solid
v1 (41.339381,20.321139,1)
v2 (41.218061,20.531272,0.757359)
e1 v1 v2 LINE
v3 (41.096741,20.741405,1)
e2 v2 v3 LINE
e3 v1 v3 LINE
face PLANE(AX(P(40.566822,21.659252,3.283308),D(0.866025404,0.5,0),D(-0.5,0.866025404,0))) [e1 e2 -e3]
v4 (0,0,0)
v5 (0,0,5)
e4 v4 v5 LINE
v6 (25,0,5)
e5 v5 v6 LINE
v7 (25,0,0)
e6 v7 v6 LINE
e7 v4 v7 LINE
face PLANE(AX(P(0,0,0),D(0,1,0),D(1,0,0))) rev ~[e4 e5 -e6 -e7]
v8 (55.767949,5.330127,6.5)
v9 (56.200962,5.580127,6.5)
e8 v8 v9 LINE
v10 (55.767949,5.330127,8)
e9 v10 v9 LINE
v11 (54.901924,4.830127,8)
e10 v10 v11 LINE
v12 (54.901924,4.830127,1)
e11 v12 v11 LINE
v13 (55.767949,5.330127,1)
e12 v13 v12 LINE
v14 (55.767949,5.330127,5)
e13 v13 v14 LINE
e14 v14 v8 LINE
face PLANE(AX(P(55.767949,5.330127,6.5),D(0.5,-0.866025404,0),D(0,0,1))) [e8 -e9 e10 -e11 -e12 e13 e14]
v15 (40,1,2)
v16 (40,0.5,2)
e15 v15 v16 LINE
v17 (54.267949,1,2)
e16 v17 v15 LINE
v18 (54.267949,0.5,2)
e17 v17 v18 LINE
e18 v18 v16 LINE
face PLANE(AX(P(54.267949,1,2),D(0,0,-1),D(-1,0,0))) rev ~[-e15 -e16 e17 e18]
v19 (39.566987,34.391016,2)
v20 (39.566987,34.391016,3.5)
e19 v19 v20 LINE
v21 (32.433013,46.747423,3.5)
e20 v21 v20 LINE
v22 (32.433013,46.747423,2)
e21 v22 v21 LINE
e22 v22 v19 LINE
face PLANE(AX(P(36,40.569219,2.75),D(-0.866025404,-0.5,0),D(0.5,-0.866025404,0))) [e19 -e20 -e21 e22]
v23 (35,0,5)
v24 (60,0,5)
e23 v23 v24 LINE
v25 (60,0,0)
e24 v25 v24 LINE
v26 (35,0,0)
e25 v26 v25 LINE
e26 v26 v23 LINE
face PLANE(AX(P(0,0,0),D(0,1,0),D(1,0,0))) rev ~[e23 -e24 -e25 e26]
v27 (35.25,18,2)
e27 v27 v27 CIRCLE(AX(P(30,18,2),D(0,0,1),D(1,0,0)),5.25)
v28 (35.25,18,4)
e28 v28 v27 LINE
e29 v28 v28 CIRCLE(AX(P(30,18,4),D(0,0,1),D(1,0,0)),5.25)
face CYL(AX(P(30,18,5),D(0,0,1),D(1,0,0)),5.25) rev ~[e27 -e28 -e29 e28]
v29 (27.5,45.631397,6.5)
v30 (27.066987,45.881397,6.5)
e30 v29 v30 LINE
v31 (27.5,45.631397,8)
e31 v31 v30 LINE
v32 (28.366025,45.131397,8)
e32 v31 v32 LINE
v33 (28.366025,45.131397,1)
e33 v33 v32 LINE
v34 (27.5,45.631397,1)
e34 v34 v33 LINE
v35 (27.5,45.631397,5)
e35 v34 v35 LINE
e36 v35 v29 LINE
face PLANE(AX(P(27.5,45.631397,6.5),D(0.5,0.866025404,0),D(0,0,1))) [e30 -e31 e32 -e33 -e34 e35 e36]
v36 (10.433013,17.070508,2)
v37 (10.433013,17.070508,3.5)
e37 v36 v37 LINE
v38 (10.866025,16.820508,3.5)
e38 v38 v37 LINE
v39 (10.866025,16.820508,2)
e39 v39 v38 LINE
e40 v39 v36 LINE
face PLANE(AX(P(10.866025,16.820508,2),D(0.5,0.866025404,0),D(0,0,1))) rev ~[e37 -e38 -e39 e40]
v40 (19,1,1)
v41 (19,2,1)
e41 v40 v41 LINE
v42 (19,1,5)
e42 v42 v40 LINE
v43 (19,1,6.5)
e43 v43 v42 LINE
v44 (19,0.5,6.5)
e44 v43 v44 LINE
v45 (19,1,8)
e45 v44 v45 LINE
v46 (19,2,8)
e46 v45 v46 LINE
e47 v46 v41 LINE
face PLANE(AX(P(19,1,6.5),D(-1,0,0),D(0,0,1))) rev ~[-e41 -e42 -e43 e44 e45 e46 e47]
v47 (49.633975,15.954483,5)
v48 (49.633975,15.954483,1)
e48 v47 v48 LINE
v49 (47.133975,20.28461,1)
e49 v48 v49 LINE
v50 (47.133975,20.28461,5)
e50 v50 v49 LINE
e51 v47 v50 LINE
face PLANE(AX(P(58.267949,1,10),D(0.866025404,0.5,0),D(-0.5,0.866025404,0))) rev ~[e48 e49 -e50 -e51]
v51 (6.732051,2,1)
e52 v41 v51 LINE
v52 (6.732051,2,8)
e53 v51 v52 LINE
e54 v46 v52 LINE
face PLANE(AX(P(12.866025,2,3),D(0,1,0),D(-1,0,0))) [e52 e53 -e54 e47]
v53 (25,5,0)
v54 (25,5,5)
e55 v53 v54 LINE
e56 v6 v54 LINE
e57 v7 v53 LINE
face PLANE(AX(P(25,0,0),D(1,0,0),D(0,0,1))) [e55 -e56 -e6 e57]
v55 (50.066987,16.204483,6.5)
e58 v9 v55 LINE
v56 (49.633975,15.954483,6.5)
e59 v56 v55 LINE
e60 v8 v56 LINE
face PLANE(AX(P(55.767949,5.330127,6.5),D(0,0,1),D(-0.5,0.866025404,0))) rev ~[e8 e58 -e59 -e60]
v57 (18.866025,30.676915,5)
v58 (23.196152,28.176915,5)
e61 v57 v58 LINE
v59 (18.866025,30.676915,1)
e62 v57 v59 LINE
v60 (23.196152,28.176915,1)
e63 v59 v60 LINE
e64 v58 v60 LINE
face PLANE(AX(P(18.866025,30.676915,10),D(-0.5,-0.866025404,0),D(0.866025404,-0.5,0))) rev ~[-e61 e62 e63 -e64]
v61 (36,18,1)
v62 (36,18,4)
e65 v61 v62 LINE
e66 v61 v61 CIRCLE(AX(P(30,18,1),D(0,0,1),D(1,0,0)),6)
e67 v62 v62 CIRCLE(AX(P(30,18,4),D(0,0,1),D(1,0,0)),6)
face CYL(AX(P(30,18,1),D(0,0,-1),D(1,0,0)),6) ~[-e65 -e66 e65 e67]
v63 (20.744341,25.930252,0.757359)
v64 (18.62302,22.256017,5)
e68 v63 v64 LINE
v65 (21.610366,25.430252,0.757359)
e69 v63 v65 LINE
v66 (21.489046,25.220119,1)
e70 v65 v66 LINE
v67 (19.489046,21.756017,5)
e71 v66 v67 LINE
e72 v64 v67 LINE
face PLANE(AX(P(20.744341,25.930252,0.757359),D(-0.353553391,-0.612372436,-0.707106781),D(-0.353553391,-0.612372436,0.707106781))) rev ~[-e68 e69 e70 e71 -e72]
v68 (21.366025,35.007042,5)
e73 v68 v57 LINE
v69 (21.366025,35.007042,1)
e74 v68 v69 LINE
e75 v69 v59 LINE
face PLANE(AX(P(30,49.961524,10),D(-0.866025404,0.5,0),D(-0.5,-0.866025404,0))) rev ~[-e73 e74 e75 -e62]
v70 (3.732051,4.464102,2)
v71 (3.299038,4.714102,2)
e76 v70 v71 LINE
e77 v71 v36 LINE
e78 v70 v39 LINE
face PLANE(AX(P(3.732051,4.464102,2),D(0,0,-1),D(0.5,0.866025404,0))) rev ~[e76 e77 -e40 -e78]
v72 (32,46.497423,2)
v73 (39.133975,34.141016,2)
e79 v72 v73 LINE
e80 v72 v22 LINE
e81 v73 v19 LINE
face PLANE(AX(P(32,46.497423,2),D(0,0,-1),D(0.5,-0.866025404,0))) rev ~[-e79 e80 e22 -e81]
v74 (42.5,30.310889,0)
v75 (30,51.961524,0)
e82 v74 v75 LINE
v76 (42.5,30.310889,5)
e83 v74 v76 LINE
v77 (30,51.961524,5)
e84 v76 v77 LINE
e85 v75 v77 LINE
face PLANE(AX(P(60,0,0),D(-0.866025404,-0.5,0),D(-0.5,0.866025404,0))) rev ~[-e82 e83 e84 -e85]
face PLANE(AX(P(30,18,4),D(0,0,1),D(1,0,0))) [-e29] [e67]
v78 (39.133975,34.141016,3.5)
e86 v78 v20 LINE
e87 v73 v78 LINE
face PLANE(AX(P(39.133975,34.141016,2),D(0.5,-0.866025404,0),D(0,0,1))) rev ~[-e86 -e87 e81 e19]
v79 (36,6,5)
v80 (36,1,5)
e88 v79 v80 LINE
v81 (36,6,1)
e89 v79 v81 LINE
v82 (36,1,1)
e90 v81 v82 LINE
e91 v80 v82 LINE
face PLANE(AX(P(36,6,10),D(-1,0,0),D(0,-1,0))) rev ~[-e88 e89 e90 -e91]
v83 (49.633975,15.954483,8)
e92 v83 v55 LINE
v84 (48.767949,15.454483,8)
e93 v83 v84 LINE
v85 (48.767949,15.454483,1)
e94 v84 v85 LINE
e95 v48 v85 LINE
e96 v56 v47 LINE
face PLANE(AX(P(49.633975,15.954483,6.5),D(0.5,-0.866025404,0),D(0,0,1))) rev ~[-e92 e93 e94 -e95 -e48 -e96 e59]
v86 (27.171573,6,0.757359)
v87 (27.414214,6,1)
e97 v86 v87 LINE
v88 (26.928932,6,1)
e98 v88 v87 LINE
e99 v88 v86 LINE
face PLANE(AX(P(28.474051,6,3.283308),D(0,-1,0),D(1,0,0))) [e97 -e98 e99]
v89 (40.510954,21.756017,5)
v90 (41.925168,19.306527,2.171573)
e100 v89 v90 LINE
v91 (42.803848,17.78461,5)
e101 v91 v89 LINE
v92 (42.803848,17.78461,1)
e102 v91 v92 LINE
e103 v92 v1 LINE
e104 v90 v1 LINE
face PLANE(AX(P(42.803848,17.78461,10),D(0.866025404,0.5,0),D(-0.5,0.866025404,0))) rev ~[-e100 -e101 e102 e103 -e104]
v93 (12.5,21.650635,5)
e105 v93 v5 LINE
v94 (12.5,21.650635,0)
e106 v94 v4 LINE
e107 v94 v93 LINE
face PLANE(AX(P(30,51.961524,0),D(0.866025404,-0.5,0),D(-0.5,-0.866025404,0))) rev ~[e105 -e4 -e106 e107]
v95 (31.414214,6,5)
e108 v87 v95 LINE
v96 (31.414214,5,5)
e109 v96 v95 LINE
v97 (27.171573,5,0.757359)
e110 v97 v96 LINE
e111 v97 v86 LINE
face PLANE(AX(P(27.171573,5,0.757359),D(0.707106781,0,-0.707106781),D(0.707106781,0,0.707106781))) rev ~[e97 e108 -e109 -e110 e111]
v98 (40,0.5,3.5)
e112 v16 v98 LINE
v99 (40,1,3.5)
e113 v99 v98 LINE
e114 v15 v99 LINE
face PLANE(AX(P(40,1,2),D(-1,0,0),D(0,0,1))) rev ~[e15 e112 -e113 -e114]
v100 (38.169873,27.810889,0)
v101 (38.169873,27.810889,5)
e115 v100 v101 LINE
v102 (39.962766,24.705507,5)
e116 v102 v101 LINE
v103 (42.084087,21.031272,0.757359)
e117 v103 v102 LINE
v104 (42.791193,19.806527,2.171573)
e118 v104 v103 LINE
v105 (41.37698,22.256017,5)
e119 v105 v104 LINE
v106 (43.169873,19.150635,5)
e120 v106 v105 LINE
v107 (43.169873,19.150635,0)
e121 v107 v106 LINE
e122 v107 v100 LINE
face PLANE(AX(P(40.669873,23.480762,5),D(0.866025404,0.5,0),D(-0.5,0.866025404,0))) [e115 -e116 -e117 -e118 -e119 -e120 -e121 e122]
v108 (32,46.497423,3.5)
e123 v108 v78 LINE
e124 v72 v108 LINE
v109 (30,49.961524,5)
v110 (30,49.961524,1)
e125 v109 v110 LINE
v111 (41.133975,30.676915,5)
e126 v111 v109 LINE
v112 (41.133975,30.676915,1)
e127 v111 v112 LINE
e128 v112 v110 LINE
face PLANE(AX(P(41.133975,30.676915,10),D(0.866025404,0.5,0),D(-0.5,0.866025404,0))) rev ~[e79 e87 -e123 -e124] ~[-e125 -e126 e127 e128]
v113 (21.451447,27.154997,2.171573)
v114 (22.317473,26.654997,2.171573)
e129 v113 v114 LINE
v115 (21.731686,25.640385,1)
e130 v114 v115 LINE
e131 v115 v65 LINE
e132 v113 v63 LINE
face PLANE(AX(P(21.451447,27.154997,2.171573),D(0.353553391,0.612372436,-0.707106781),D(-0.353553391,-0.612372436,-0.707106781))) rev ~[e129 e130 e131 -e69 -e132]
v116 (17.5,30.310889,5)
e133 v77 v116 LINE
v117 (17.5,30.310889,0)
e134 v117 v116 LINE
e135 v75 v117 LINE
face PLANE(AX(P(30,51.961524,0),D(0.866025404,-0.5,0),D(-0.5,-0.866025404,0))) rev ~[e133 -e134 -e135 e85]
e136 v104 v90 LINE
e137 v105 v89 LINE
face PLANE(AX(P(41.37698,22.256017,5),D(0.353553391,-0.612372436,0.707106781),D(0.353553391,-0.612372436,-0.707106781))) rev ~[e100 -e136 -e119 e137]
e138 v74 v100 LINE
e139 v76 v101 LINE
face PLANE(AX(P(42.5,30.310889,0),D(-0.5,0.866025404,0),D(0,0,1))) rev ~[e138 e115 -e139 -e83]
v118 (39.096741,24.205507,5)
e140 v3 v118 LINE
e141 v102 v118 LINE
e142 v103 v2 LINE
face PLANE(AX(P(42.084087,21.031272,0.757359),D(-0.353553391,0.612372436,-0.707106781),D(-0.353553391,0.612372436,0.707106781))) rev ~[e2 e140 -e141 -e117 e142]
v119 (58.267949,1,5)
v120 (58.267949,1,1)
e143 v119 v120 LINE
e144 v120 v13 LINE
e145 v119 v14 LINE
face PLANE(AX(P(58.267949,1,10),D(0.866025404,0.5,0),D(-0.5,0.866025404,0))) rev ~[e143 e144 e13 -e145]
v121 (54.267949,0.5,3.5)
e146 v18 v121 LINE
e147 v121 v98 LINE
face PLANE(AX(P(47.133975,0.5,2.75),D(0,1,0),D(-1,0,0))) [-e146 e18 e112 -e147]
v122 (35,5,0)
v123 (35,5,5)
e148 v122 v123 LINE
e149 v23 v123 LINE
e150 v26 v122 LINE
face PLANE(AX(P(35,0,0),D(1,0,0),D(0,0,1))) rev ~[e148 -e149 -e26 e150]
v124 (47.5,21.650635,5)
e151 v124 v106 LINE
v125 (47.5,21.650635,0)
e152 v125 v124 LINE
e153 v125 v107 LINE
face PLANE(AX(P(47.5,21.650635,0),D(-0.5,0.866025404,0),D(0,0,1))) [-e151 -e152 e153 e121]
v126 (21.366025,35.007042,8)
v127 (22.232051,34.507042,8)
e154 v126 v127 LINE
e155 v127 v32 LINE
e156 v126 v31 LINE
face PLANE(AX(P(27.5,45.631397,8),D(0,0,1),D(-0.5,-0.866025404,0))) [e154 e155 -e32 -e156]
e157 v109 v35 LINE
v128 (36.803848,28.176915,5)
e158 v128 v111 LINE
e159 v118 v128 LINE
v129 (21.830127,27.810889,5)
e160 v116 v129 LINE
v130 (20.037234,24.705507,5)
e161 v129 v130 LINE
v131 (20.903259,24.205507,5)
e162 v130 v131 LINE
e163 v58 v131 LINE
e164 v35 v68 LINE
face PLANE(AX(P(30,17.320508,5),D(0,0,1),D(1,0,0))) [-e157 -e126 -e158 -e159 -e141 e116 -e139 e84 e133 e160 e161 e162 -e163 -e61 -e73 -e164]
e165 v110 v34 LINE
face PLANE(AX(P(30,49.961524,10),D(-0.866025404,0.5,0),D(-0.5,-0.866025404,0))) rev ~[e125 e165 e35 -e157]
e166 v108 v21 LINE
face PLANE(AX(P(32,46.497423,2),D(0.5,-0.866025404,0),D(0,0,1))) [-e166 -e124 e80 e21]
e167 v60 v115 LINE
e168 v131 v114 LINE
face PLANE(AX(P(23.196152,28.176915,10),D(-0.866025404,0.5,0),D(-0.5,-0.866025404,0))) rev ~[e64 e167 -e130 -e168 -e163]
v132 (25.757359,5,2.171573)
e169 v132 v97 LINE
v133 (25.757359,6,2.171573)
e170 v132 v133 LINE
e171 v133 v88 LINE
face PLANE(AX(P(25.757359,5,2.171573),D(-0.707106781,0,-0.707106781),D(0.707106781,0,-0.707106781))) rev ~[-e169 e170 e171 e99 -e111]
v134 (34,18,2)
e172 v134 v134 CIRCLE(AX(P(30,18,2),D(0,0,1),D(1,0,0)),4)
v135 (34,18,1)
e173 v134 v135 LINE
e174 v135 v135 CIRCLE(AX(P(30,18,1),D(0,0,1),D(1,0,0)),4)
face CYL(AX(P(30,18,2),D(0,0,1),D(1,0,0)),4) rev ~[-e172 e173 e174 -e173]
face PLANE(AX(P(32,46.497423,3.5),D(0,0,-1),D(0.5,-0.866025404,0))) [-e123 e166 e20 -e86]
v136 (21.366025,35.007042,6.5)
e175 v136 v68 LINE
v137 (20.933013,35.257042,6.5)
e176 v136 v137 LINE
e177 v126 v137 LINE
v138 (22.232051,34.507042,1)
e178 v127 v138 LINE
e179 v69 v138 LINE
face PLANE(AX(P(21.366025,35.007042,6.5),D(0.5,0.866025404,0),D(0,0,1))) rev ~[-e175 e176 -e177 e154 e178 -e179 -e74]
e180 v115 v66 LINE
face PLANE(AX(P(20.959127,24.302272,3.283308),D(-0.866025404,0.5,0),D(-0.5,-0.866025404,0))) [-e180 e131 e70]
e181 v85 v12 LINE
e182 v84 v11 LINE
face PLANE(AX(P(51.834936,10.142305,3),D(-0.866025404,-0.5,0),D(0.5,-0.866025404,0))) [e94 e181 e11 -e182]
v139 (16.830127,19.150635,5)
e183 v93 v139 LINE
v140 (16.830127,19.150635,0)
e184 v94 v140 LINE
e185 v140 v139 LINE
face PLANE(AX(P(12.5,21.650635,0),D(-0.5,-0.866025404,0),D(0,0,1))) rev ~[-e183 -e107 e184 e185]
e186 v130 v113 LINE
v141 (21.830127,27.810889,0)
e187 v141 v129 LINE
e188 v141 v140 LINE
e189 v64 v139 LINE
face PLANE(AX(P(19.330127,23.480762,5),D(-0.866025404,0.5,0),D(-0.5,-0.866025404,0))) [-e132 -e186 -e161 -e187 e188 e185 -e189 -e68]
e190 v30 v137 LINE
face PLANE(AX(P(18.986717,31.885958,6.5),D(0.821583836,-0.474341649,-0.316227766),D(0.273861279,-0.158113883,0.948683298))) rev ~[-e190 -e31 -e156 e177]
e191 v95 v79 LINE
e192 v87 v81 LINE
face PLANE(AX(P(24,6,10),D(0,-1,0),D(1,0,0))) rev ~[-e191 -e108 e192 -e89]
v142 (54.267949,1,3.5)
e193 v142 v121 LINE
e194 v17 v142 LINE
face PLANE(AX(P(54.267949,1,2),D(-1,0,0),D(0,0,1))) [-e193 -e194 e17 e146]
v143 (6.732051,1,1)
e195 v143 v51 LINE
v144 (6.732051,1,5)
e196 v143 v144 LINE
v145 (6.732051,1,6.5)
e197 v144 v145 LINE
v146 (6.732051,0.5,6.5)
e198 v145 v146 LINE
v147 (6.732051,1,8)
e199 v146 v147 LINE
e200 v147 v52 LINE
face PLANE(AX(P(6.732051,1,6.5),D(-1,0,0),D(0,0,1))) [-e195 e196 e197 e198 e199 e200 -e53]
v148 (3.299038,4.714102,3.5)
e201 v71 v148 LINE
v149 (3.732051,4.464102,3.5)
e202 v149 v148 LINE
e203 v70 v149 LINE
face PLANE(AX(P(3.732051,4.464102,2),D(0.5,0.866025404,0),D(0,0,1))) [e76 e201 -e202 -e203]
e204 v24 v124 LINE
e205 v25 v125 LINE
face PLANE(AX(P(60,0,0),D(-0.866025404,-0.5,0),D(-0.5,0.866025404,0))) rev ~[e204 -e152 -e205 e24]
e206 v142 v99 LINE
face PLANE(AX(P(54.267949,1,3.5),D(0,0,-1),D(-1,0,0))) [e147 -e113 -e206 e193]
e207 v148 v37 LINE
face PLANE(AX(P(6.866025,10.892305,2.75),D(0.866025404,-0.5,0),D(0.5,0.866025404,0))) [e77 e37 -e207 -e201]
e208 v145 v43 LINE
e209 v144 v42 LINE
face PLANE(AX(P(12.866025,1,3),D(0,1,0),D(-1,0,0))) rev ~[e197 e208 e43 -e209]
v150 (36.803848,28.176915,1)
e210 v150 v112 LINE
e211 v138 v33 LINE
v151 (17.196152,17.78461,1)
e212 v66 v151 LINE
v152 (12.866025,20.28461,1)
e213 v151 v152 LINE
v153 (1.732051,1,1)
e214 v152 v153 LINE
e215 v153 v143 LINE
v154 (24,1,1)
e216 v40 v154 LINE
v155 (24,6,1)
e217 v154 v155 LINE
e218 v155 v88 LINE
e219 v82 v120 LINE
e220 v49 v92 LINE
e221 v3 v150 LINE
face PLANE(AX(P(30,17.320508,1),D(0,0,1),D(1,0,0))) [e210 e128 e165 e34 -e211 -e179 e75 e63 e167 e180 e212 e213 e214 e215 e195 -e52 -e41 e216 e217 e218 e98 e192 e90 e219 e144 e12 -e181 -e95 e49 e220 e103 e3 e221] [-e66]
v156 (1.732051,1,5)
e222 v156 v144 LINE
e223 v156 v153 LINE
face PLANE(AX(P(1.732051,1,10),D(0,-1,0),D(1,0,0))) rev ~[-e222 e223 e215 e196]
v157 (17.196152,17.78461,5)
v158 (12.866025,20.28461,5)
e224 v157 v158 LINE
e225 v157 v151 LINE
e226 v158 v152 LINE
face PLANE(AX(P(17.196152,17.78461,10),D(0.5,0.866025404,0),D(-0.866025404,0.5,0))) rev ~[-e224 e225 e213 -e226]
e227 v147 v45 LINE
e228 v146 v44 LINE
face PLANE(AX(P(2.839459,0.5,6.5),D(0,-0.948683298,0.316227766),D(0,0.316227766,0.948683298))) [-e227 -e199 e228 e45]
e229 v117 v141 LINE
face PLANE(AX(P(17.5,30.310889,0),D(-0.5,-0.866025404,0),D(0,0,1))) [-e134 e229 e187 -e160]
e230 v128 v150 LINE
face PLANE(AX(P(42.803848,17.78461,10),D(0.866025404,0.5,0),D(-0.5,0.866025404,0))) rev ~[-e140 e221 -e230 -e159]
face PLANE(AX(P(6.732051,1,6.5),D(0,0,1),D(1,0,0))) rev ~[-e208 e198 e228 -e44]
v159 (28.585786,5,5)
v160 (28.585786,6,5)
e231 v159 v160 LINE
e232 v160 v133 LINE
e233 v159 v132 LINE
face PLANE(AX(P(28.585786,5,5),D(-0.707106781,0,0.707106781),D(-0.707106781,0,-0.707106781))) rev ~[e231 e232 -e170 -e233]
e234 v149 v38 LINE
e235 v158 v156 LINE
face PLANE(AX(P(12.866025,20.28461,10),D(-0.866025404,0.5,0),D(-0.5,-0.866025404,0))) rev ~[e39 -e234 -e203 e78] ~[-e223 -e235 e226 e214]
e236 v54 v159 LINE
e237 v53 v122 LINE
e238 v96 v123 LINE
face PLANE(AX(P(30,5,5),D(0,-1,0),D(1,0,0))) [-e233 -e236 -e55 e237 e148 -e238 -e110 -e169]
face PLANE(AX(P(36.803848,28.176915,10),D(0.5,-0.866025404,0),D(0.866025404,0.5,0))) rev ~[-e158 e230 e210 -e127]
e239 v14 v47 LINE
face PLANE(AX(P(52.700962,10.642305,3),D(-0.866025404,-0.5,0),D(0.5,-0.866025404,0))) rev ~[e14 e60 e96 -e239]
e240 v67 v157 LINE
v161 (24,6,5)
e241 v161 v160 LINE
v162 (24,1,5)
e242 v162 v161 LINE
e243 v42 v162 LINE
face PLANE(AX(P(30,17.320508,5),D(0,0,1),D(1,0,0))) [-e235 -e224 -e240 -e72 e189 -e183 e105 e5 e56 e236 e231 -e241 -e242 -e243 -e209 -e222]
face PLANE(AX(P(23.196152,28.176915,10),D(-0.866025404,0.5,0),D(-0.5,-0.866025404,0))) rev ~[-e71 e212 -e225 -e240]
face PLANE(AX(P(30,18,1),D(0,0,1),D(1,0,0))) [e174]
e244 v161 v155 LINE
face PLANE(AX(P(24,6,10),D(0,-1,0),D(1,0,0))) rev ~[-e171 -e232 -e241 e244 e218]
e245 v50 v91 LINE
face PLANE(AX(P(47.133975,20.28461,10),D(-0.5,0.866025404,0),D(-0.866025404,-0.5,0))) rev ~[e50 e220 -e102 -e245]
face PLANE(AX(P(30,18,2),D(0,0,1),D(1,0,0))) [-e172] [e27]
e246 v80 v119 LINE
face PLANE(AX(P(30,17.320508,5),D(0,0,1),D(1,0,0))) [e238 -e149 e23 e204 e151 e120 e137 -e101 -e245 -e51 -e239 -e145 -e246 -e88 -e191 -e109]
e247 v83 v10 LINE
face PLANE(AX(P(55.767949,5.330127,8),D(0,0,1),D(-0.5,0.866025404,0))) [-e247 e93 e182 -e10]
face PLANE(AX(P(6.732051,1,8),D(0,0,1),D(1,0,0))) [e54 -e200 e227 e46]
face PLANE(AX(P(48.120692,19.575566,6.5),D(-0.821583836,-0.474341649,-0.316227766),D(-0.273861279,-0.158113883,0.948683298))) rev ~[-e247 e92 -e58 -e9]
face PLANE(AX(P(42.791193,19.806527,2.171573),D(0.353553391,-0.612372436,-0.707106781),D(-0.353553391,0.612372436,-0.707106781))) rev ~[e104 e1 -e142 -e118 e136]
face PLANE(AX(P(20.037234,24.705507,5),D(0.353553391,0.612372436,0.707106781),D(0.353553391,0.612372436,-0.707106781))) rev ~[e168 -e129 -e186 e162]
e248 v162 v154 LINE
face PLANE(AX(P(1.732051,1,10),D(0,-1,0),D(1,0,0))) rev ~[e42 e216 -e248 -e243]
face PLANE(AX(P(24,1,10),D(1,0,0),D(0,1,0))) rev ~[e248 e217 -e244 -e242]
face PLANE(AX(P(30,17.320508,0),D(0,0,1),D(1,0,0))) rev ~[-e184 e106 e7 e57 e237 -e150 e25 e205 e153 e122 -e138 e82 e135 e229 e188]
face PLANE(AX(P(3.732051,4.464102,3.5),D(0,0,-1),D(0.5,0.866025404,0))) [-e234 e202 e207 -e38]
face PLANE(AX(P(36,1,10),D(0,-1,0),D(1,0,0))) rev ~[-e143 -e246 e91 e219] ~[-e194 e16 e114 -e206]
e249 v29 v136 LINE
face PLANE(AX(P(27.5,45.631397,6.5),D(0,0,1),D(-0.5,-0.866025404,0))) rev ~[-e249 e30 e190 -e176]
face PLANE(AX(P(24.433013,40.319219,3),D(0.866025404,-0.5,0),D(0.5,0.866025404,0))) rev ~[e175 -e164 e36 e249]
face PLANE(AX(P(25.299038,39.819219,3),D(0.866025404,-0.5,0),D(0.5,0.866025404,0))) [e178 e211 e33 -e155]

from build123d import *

# Parameters (mm, degrees)
F1_DEPTH     = 10
F2_W         = 10
F2_H         = 10
F3_DEPTH     = 5
F4_W         = 10
F4_H         = 10
F5_DEPTH     = 5
F6_W         = 10
F6_H         = 10
F7_DEPTH     = 5
F9_DEPTH     = 9
F10_DEPTH    = 5
F11_W        = 12.2679491924
F11_H        = 4
F11_H_2      = 3
F12_DEPTH    = 1
F13_W        = 12.2679491924
F13_H        = 4
F13_H_2      = 3
F14_DEPTH    = 1
F15_W        = 12.2679491924
F15_H        = 4
F15_H_2      = 3
F16_DEPTH    = 1
F17_W        = 12.2679491924
F17_H        = 1.5
F18_DEPTH    = 0.5
F19_T1_DEPTH = 20.0531322244
F20_W        = 12.2679491924
F20_H        = 1.5
F21_DEPTH    = 0.5
F22_T1_DEPTH = 20.0531322244
F23_W        = 12.2679491924
F23_H        = 1.5
F24_DEPTH    = 0.5
F25_T1_DEPTH = 20.0531322244
F26_W        = 14.2679491924
F26_H        = 1.5
F27_DEPTH    = 0.5
F28_W        = 14.2679491924
F28_H        = 1.5
F29_DEPTH    = 0.5
F30_W        = 14.2679491924
F30_H        = 1.5
F31_DEPTH    = 0.5
F32_R        = 6
F33_DEPTH    = 4
F34_R        = 5.25
F35_DEPTH    = 3
F36_R        = 4
F37_DEPTH    = 1
F39_DEPTH    = 1
F41_DEPTH    = 1
F43_DEPTH    = 1
F44_DEPTH    = 1


# Not quite as in the source:
# - a fillet or chamfer that OpenCascade refuses, or shapes differently, is made with other operations: its cross-section is extruded or revolved along the edge and cut away or added


with BuildPart() as f1:
    # F0 (on Top) → F1 (new body)
    with BuildSketch(Plane.XY):
        Polygon((30, 51.9615242271), (0, 0), (60, 0), align=None)
    extrude(amount=F1_DEPTH)

    # F2 (on face) → F3 (cut)
    with BuildSketch(Plane.XZ):
        with Locations((30, 5)):
            Rectangle(F2_W, F2_H)
    extrude(amount=-F3_DEPTH, mode=Mode.SUBTRACT)

    # F4 (on face) → F5 (cut)
    with BuildSketch(Plane(origin=(0, 0, 0), x_dir=(-0.5, -0.8660254038, 0), z_dir=(-0.8660254038, 0.5, 0))):
        with Locations((-30, 5)):
            Rectangle(F4_W, F4_H)
    extrude(amount=-F5_DEPTH, mode=Mode.SUBTRACT)

    # F6 (on face) → F7 (cut)
    with BuildSketch(Plane(origin=(45, 25.9807621135, 0), x_dir=(-0.5, 0.8660254038, 0), z_dir=(0.8660254038, 0.5, 0))):
        with Locations((0, 5)):
            Rectangle(F6_W, F6_H)
    extrude(amount=-F7_DEPTH, mode=Mode.SUBTRACT)

    # F8 (on face) → F9 (cut)
    with BuildSketch(Plane.XY.offset(10)):
        Polygon((18.8660254038, 30.6769145362), (23.1961524227, 28.1769145362), (17.1961524227, 17.7846096908), (12.8660254038, 20.2846096908), (1.7320508076, 1), (24, 1), (24, 6), (36, 6), (36, 1), (58.2679491924, 1), (47.1339745962, 20.2846096908), (42.8038475773, 17.7846096908), (36.8038475773, 28.1769145362), (41.1339745962, 30.6769145362), (30, 49.9615242271), align=None)
    extrude(amount=-F9_DEPTH, mode=Mode.SUBTRACT)

    # F10 (cut): a face of the model
    f10_faces = [f1.faces().sort_by_distance(p)[0] for p in [
        (35.7937253933, 2.5, 10),
    ]]
    extrude(f10_faces, amount=-F10_DEPTH, mode=Mode.SUBTRACT)

    # F11 (on face) → F12 (join)
    with BuildSketch(Plane(origin=(0.8660254038, -0.5, 0), x_dir=(0.5, 0.8660254038, 0), z_dir=(0.8660254038, -0.5, 0))):
        with Locations((47.1339745962, 3)):
            Rectangle(F11_W, F11_H)
        with Locations((47.1339745962, 6.5)):
            Rectangle(F11_W, F11_H_2)
    extrude(amount=F12_DEPTH)

    # F13 (on face) → F14 (join)
    with BuildSketch(Plane(origin=(0, 1, 0), x_dir=(-1, 0, 0), z_dir=(0, 1, 0))):
        with Locations((-12.8660254038, 3)):
            Rectangle(F13_W, F13_H)
        with Locations((-12.8660254038, 6.5)):
            Rectangle(F13_W, F13_H_2)
    extrude(amount=F14_DEPTH)

    # F15 (on face) → F16 (join)
    with BuildSketch(Plane(origin=(44.1339745962, 25.4807621135, 0), x_dir=(0.5, -0.8660254038, 0), z_dir=(-0.8660254038, -0.5, 0))):
        with Locations((17.1339745962, 3)):
            Rectangle(F15_W, F15_H)
        with Locations((17.1339745962, 6.5)):
            Rectangle(F15_W, F15_H_2)
    extrude(amount=F16_DEPTH)

    # F17 (on face) → F18 (join)
    with BuildSketch(Plane.XZ.offset(-1)):
        with Locations((12.8660254038, 7.25)):
            Rectangle(F17_W, F17_H)
    extrude(amount=F18_DEPTH)

    # F19: chamfer of 0.5 x 1.5 on 1 edges, made by hand

    # F19_s2 → F19_t1 (cut)
    with BuildSketch(Plane.YZ.offset(2.8394592916)):
        Polygon((0.5, 6.5), (1, 8), (0.5, 8), align=None)
    extrude(amount=F19_T1_DEPTH, mode=Mode.SUBTRACT)

    # F20 (on face) → F21 (join)
    with BuildSketch(Plane(origin=(44.1339745962, 25.4807621135, 0), x_dir=(-0.5, 0.8660254038, 0), z_dir=(0.8660254038, 0.5, 0))):
        with Locations((-17.1339745962, 7.25)):
            Rectangle(F20_W, F20_H)
    extrude(amount=F21_DEPTH)

    # F22: chamfer of 0.5 x 1.5 on 1 edges, made by hand

    # F22_s2 → F22_t1 (cut)
    with BuildSketch(Plane(origin=(3.553704242, -6.1551963022, 0), x_dir=(0, 0, 1), z_dir=(0.5, -0.8660254038, 0))):
        Polygon((6.5, -51.4615242271), (8, -50.9615242271), (8, -51.4615242271), align=None)
    extrude(amount=F22_T1_DEPTH, mode=Mode.SUBTRACT)

    # F23 (on face) → F24 (join)
    with BuildSketch(Plane(origin=(0.8660254038, -0.5, 0), x_dir=(-0.5, -0.8660254038, 0), z_dir=(-0.8660254038, 0.5, 0))):
        with Locations((-47.1339745962, 7.25)):
            Rectangle(F23_W, F23_H)
    extrude(amount=F24_DEPTH)

    # F25: chamfer of 0.5 x 1.5 on 1 edges, made by hand

    # F25_s2 → F25_t1 (cut)
    with BuildSketch(Plane(origin=(18.553704242, 32.1359584158, 0), x_dir=(0, 0, 1), z_dir=(0.5, 0.8660254038, 0))):
        Polygon((6.5, 0.5), (8, 1), (8, 0.5), align=None)
    extrude(amount=F25_T1_DEPTH, mode=Mode.SUBTRACT)

    # F26 (on face) → F27 (cut)
    with BuildSketch(Plane(origin=(44.1339745962, 25.4807621135, 0), x_dir=(0.5, -0.8660254038, 0), z_dir=(-0.8660254038, -0.5, 0))):
        with Locations((-17.1339745962, 2.75)):
            Rectangle(F26_W, F26_H)
    extrude(amount=-F27_DEPTH, mode=Mode.SUBTRACT)

    # F28 (on face) → F29 (cut)
    with BuildSketch(Plane(origin=(0, 1, 0), x_dir=(-1, 0, 0), z_dir=(0, 1, 0))):
        with Locations((-47.1339745962, 2.75)):
            Rectangle(F28_W, F28_H)
    extrude(amount=-F29_DEPTH, mode=Mode.SUBTRACT)

    # F30 (on face) → F31 (cut)
    with BuildSketch(Plane(origin=(0.8660254038, -0.5, 0), x_dir=(0.5, 0.8660254038, 0), z_dir=(0.8660254038, -0.5, 0))):
        with Locations((12.8660254038, 2.75)):
            Rectangle(F30_W, F30_H)
    extrude(amount=-F31_DEPTH, mode=Mode.SUBTRACT)

    # F32 (on face) → F33 (join)
    with BuildSketch(Plane.XY.offset(1)):
        with Locations((30, 18)):
            Circle(F32_R)
    extrude(amount=F33_DEPTH)

    # F34 (on face) → F35 (cut)
    with BuildSketch(Plane.XY.offset(5)):
        with Locations((30, 18)):
            Circle(F34_R)
    extrude(amount=-F35_DEPTH, mode=Mode.SUBTRACT)

    # F36 (on face) → F37 (cut)
    with BuildSketch(Plane.XY.offset(2)):
        with Locations((30, 18)):
            Circle(F36_R)
    extrude(amount=-F37_DEPTH, mode=Mode.SUBTRACT)

    # F38 (on face) → F39 (cut)
    with BuildSketch(Plane.XZ.offset(-5)):
        Polygon((25.7573593129, 2.1715728753), (27.1715728753, 0.7573593129), (31.4142135624, 5), (28.5857864376, 5), align=None)
    extrude(amount=-F39_DEPTH, mode=Mode.SUBTRACT)

    # F40 (on face) → F41 (cut)
    with BuildSketch(Plane(origin=(40.6698729811, 23.4807621135, 0), x_dir=(-0.5, 0.8660254038, 0), z_dir=(0.8660254038, 0.5, 0))):
        Polygon((-4.2426406871, 2.1715728753), (-2.8284271247, 0.7573593129), (1.4142135624, 5), (-1.4142135624, 5), align=None)
    extrude(amount=-F41_DEPTH, mode=Mode.SUBTRACT)

    # F42 (on face) → F43 (cut)
    with BuildSketch(Plane(origin=(4.3301270189, -2.5, 0), x_dir=(-0.5, -0.8660254038, 0), z_dir=(-0.8660254038, 0.5, 0))):
        Polygon((-34.2426406871, 2.1715728753), (-32.8284271247, 0.7573593129), (-28.5857864376, 5), (-31.4142135624, 5), align=None)
    extrude(amount=-F43_DEPTH, mode=Mode.SUBTRACT)

    # F44 (cut): a face of the model
    f44_faces = [f1.faces().sort_by_distance(p)[0] for p in [
        (24.1697056275, 18, 5),
    ]]
    extrude(f44_faces, amount=-F44_DEPTH, mode=Mode.SUBTRACT)


solid = f1.part
